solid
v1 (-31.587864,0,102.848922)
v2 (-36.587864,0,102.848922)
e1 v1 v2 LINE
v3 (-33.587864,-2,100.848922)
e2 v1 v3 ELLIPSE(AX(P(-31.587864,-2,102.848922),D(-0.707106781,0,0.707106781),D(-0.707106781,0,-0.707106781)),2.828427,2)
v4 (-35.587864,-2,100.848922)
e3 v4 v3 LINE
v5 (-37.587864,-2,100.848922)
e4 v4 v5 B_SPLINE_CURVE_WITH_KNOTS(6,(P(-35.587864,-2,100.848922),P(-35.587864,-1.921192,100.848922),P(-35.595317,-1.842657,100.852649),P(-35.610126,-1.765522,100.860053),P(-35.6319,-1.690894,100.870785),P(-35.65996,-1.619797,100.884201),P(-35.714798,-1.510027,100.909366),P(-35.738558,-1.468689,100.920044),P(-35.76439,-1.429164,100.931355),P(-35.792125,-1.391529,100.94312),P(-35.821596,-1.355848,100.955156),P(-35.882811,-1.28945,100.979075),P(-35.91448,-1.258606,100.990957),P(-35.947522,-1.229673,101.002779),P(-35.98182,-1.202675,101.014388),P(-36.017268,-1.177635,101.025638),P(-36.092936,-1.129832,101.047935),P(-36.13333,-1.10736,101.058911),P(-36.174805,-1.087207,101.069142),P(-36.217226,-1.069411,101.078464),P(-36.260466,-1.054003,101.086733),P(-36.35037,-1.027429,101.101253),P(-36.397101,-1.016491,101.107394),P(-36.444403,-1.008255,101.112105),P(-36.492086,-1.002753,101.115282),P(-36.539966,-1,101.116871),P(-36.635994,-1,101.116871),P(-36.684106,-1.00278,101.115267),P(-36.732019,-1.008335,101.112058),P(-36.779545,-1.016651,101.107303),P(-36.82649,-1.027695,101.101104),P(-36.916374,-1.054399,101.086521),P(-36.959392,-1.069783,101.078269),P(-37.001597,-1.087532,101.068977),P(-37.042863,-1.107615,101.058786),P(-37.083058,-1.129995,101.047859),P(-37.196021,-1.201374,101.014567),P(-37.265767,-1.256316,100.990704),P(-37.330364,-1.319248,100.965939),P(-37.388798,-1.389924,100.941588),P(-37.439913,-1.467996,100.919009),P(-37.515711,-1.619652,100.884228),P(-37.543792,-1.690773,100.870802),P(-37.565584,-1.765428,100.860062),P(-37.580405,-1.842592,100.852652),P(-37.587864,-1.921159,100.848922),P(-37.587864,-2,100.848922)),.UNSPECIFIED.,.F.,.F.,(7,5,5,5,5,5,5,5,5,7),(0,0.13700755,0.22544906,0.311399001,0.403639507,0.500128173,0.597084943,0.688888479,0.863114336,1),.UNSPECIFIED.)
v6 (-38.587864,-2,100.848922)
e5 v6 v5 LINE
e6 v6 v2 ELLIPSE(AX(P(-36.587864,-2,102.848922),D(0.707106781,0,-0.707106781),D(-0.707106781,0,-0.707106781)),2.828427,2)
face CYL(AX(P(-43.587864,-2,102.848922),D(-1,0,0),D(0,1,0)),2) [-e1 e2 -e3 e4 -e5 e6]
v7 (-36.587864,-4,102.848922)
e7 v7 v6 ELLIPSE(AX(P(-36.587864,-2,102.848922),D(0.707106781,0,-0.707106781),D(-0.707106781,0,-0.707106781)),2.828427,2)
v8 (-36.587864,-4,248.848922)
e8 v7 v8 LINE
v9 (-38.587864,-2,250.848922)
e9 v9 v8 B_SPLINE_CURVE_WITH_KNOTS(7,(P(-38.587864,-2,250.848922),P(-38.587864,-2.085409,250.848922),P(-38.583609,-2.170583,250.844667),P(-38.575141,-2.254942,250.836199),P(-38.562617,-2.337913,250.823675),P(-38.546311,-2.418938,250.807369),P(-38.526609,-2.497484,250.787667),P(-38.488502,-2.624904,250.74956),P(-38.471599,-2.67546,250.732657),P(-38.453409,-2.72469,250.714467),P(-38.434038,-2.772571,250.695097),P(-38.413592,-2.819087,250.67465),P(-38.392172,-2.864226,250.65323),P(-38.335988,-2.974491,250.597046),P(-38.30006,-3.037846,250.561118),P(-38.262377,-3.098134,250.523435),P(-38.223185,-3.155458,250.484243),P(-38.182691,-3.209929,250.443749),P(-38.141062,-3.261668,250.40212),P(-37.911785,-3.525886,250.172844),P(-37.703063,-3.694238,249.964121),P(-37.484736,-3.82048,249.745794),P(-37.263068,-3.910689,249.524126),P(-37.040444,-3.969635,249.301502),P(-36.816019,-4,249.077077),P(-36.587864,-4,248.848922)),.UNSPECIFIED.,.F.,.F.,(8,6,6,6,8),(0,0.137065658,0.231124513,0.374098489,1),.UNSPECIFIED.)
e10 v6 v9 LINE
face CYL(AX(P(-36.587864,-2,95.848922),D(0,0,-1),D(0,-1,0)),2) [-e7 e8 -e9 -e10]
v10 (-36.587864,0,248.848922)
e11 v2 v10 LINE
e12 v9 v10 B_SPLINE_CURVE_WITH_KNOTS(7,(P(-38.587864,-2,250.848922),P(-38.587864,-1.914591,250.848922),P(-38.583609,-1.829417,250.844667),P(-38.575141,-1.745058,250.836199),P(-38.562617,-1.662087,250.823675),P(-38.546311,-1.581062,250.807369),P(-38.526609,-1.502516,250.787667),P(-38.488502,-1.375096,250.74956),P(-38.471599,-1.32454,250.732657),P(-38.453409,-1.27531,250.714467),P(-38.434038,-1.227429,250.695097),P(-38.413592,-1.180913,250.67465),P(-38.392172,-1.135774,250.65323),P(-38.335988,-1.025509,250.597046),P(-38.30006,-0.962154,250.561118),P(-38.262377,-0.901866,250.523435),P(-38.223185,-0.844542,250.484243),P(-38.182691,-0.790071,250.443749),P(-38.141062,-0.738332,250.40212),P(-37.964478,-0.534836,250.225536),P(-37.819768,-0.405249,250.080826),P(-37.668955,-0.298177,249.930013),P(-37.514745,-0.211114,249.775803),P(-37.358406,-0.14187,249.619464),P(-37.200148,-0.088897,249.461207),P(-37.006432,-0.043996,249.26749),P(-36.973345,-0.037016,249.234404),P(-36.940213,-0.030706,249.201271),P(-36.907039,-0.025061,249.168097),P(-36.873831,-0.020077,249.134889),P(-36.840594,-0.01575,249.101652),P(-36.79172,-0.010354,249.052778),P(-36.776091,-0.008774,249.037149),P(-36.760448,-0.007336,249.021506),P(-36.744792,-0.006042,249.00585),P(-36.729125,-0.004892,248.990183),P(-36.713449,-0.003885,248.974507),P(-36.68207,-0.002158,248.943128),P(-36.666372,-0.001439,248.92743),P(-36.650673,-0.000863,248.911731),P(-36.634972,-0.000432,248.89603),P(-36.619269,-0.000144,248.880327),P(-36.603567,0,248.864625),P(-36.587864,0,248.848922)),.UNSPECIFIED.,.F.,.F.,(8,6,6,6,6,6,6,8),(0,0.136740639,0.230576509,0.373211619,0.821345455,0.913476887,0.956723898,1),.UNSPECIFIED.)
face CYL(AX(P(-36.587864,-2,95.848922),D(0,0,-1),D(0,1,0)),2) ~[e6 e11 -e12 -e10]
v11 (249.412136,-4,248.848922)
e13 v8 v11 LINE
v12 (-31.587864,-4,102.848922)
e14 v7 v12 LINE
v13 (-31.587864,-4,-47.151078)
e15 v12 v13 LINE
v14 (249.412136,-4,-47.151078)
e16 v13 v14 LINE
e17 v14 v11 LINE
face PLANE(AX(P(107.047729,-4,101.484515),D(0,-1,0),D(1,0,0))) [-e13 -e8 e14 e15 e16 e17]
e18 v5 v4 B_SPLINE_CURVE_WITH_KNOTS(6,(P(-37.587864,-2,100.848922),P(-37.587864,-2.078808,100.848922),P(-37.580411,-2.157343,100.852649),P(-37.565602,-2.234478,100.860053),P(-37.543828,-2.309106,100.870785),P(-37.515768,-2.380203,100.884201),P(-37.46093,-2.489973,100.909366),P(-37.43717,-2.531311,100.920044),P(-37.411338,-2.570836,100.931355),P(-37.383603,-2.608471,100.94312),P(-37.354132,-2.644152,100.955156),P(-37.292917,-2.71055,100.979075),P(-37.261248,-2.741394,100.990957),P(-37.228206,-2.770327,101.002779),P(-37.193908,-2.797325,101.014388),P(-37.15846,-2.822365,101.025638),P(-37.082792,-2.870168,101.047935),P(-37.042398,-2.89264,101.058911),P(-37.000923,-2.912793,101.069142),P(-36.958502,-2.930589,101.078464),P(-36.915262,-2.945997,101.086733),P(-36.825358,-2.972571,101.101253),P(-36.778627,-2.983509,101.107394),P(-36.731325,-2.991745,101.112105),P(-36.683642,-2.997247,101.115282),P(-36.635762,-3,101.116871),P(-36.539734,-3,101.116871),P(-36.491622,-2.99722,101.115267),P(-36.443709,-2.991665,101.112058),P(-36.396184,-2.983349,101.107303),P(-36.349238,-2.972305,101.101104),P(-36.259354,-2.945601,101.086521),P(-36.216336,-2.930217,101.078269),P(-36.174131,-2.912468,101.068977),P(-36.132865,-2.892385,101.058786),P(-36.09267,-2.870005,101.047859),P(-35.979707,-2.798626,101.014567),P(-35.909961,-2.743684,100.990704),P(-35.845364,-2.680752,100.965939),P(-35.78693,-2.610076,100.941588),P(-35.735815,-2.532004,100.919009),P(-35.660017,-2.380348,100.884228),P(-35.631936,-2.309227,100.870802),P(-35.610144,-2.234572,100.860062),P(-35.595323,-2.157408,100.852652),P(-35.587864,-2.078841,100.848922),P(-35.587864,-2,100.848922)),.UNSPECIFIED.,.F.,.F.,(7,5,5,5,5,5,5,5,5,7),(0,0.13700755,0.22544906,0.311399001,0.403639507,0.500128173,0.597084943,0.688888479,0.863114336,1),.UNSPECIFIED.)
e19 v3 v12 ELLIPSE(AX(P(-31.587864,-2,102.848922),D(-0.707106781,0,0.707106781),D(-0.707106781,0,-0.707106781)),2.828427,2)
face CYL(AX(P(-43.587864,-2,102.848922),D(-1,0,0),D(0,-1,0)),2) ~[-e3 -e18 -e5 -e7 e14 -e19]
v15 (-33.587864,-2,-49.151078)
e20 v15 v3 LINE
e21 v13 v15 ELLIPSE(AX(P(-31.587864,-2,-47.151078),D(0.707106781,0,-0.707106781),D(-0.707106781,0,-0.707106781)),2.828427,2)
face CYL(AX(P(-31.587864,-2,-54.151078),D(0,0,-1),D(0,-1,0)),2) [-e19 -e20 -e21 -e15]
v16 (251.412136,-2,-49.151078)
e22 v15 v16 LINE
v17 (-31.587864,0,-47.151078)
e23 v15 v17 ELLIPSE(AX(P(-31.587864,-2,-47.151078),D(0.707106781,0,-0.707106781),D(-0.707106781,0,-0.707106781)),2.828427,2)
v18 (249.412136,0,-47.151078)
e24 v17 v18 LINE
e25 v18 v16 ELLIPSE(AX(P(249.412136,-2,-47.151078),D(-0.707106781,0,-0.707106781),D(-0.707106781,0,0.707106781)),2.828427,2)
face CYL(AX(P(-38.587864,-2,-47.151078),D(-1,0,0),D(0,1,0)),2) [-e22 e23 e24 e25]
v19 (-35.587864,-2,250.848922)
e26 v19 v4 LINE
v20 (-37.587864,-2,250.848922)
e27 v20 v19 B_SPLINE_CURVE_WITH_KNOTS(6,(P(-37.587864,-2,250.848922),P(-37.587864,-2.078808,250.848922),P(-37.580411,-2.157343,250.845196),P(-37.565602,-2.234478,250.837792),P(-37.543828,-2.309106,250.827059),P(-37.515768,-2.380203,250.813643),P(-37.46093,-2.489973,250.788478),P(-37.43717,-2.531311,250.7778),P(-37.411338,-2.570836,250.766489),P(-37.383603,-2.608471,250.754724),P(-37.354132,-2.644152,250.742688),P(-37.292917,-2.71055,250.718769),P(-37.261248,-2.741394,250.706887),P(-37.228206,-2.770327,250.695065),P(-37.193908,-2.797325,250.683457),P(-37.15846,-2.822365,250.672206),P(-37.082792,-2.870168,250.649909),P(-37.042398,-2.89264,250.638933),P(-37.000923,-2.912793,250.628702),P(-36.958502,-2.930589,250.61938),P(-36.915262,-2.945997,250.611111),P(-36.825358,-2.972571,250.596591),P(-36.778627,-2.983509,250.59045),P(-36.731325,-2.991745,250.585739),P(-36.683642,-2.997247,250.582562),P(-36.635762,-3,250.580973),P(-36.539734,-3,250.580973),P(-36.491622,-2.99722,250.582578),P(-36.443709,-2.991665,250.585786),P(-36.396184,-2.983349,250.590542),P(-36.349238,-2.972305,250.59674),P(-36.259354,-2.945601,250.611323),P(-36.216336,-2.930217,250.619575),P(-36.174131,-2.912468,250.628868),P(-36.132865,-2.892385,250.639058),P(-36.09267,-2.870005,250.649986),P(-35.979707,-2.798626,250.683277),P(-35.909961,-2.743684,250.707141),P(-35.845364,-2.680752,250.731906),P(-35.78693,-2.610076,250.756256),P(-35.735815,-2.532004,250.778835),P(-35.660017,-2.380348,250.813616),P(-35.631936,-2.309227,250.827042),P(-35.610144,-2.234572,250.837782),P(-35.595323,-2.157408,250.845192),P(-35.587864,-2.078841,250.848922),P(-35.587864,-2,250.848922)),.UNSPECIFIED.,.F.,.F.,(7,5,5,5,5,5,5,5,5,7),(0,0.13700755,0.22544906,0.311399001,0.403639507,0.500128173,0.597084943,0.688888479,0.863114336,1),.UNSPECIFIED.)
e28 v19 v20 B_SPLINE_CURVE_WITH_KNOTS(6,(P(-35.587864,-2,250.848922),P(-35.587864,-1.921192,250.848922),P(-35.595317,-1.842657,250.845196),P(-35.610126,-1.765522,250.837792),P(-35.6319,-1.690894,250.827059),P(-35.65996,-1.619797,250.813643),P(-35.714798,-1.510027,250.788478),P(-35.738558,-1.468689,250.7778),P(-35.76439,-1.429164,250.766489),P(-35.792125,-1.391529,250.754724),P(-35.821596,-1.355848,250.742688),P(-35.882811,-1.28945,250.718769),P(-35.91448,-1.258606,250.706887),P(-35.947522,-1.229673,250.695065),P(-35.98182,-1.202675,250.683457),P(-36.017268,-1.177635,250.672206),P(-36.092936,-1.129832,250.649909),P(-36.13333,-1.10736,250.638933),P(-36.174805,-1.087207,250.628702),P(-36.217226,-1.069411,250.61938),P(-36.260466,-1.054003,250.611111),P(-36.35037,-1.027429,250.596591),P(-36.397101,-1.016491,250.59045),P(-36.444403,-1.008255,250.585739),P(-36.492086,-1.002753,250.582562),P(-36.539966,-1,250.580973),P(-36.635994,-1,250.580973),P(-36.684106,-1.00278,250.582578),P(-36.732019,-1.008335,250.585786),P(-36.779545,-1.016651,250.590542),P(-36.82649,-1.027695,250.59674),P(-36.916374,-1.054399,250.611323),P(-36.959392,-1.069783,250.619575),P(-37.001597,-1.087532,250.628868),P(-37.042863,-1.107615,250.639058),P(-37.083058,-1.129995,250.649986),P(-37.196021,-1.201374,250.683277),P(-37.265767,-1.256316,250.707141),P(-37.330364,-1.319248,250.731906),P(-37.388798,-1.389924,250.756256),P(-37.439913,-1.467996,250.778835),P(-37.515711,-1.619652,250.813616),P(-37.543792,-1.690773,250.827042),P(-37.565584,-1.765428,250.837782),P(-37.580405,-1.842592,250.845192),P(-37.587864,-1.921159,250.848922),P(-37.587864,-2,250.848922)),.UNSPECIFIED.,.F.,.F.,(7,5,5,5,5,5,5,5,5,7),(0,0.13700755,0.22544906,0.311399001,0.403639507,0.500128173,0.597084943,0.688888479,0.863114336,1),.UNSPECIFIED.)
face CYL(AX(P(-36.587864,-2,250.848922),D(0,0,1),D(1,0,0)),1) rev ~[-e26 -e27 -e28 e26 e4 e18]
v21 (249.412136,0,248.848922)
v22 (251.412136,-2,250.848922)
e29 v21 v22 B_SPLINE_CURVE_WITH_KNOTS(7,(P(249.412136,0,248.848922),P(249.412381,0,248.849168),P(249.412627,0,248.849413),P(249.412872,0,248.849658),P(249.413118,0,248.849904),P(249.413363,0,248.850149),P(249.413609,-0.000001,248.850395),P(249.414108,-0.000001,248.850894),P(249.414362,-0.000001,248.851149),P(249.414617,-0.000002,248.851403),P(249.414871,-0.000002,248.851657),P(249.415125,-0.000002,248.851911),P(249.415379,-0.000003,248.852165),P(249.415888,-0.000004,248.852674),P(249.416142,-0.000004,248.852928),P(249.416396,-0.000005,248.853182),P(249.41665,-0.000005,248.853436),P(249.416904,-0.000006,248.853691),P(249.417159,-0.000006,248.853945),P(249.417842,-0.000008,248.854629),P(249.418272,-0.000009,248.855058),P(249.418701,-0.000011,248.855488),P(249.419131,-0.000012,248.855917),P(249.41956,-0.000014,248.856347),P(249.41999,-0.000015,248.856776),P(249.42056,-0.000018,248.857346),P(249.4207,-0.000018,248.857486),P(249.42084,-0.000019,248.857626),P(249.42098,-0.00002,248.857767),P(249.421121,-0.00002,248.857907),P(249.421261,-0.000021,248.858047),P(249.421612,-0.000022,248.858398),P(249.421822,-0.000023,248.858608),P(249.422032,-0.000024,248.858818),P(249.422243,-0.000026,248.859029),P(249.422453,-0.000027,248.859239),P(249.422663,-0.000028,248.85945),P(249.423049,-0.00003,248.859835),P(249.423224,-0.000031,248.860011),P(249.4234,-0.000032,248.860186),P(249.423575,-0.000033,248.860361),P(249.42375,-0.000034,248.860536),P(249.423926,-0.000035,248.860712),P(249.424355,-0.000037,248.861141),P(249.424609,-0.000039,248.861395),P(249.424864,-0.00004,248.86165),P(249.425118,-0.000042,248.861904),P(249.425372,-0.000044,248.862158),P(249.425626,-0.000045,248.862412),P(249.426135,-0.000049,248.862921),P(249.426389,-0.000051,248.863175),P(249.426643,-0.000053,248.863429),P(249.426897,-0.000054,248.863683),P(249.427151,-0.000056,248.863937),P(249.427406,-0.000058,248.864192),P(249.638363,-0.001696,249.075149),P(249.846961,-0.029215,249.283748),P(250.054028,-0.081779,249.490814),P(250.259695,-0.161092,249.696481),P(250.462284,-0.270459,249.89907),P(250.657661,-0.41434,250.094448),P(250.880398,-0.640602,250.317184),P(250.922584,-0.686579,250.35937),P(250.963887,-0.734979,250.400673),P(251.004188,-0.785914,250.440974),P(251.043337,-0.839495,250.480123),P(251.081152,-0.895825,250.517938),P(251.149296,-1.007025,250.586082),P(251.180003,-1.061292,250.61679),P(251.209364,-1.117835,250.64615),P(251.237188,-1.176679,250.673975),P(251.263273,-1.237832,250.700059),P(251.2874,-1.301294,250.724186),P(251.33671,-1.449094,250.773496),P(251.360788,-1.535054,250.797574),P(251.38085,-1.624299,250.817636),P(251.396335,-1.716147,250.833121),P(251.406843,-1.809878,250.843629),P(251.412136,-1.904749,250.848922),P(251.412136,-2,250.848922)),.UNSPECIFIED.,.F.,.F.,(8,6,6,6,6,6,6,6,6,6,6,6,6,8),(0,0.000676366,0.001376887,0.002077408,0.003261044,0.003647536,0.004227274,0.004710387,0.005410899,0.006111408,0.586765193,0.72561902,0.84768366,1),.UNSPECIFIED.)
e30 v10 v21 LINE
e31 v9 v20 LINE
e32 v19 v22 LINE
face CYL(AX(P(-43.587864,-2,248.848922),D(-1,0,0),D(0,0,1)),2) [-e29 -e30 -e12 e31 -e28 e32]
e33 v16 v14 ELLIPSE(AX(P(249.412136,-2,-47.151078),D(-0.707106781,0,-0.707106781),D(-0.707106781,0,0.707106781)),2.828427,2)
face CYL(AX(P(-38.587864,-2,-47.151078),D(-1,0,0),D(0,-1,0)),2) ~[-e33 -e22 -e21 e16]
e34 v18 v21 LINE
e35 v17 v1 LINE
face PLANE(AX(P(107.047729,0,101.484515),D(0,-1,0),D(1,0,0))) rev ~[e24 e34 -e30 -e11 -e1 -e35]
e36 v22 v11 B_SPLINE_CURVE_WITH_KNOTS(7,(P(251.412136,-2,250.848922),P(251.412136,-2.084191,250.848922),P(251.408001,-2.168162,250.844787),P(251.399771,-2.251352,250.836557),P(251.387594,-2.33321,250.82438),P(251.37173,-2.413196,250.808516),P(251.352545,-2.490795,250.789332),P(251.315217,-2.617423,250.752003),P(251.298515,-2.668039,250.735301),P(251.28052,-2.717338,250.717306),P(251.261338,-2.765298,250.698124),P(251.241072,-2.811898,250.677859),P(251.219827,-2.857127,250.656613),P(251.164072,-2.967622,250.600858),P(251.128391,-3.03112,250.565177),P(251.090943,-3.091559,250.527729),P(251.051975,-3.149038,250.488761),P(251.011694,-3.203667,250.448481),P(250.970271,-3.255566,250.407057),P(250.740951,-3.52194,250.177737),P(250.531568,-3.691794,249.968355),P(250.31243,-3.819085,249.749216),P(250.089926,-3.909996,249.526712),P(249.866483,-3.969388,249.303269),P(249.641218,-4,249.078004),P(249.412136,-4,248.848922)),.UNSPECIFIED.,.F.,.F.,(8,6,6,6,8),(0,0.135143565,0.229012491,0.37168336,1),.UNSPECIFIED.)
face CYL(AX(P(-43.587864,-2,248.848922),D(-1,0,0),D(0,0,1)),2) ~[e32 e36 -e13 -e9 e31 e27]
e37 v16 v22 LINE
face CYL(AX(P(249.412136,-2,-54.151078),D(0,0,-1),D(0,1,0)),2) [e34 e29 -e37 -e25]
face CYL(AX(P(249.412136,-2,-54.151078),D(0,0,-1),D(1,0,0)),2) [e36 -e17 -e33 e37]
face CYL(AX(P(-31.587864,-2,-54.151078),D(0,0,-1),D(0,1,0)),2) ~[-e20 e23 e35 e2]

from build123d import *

# Parameters (mm, degrees)
F1_DEPTH     = 4
F2_R         = 1
F3_DEPTH     = 310
F4_T1_DEPTH  = 300
F4_T3_DEPTH  = 160
F4_T5_DEPTH  = 10
F4_T7_DEPTH  = 155
F4_T9_DEPTH  = 295
F4_T11_DEPTH = 310
F4_T17_DEPTH = 15
F4_T21_DEPTH = 160
F5_T1_DEPTH  = 300
F5_T3_DEPTH  = 160
F5_T5_DEPTH  = 10
F5_T7_DEPTH  = 155
F5_T9_DEPTH  = 295
F5_T11_DEPTH = 310
F5_T17_DEPTH = 15
F5_T21_DEPTH = 160


# Not quite as in the source:
# - a fillet or chamfer that OpenCascade refuses, or shapes differently, is made with other operations: its cross-section is extruded or revolved along the edge and cut away or added


with BuildPart() as f1:
    # F0 (on Front) → F1 (new body)
    with BuildSketch(Plane.XZ):
        Polygon((251.4121359825, 250.8489221025), (-38.5878640175, 250.8489221025), (-38.5878640175, 100.8489221025), (-33.5878640175, 100.8489221025), (-33.5878640175, -49.1510778975), (251.4121359825, -49.1510778975), align=None)
    extrude(amount=F1_DEPTH)

    # F2 (on face) → F3 (cut)
    with BuildSketch(Plane.XY.offset(250.8489221025)):
        with Locations((-36.5878640175, -2)):
            Circle(F2_R)
    extrude(amount=-F3_DEPTH, mode=Mode.SUBTRACT)

    # F4: fillet of radius 2 on 6 edges, made by hand

    # F4_s2 → F4_t1 (cut)
    with BuildSketch(Plane.YZ.offset(-43.5878640175)):
        with BuildLine():
            ThreePointArc((-2, 250.8489221025), (-3.4142135624, 250.2631356648), (-4, 248.8489221025))
            Line((-4, 248.8489221025), (-4, 250.8489221025))
            Line((-4, 250.8489221025), (-2, 250.8489221025))
        make_face()
    extrude(amount=F4_T1_DEPTH, mode=Mode.SUBTRACT)

    # F4_s4 → F4_t3 (cut)
    with BuildSketch(Plane.XY.offset(95.8489221025)):
        with BuildLine():
            ThreePointArc((-36.5878640175, -4), (-38.0020775799, -3.4142135624), (-38.5878640175, -2))
            Line((-38.5878640175, -2), (-38.5878640175, -4))
            Line((-38.5878640175, -4), (-36.5878640175, -4))
        make_face()
    extrude(amount=F4_T3_DEPTH, mode=Mode.SUBTRACT)

    # F4_s6 → F4_t5 (cut)
    with BuildSketch(Plane.YZ.offset(-43.5878640175)):
        with BuildLine():
            ThreePointArc((-4, 102.8489221025), (-3.4142135624, 101.4347085401), (-2, 100.8489221025))
            Line((-2, 100.8489221025), (-4, 100.8489221025))
            Line((-4, 100.8489221025), (-4, 102.8489221025))
        make_face()
    extrude(amount=F4_T5_DEPTH, mode=Mode.SUBTRACT)

    # F4_s8 → F4_t7 (cut)
    with BuildSketch(Plane.XY.offset(-54.1510778975)):
        with BuildLine():
            ThreePointArc((-31.5878640175, -4), (-33.0020775799, -3.4142135624), (-33.5878640175, -2))
            Line((-33.5878640175, -2), (-33.5878640175, -4))
            Line((-33.5878640175, -4), (-31.5878640175, -4))
        make_face()
    extrude(amount=F4_T7_DEPTH, mode=Mode.SUBTRACT)

    # F4_s10 → F4_t9 (cut)
    with BuildSketch(Plane.YZ.offset(-38.5878640175)):
        with BuildLine():
            ThreePointArc((-4, -47.1510778975), (-3.4142135624, -48.5652914599), (-2, -49.1510778975))
            Line((-2, -49.1510778975), (-4, -49.1510778975))
            Line((-4, -49.1510778975), (-4, -47.1510778975))
        make_face()
    extrude(amount=F4_T9_DEPTH, mode=Mode.SUBTRACT)

    # F4_s12 → F4_t11 (cut)
    with BuildSketch(Plane.XY.offset(-54.1510778975)):
        with BuildLine():
            ThreePointArc((251.4121359825, -2), (250.8263495449, -3.4142135624), (249.4121359825, -4))
            Line((249.4121359825, -4), (251.4121359825, -4))
            Line((251.4121359825, -4), (251.4121359825, -2))
        make_face()
    extrude(amount=F4_T11_DEPTH, mode=Mode.SUBTRACT)


with BuildPart() as f4_tool15:
    # F4_s16 → F4_t17 (new body)
    with BuildSketch(Plane.YZ.offset(-43.5878640175)):
        with BuildLine():
            ThreePointArc((-4, 102.8489221025), (-3.4142135624, 101.4347085401), (-2, 100.8489221025))
            Line((-2, 100.8489221025), (-4, 100.8489221025))
            Line((-4, 100.8489221025), (-4, 102.8489221025))
        make_face()
    extrude(amount=F4_T17_DEPTH)

    split(bisect_by=Plane.YZ.offset(-33.5878640175), keep=Keep.TOP)


with BuildPart() as f4_tool19:
    # F4_s20 → F4_t21 (new body)
    with BuildSketch(Plane.XY.offset(105.8489221025)):
        with BuildLine():
            ThreePointArc((-31.5878640175, -4), (-33.0020775799, -3.4142135624), (-33.5878640175, -2))
            Line((-33.5878640175, -2), (-33.5878640175, -4))
            Line((-33.5878640175, -4), (-31.5878640175, -4))
        make_face()
    extrude(amount=-F4_T21_DEPTH)

    split(bisect_by=Plane.XY.offset(100.8489221025), keep=Keep.TOP)


with BuildPart() as f4_tool15_1:
    add(f4_tool15.part)

    # F4_t23: intersect F4_tool19
    add(f4_tool19.part, mode=Mode.INTERSECT)


with BuildPart() as f1_1:
    add(f1.part)

    # F4_t13: cut F4_tool15
    add(f4_tool15_1.part, mode=Mode.SUBTRACT)

    # F5: fillet of radius 2 on 6 edges, made by hand

    # F5_s2 → F5_t1 (cut)
    with BuildSketch(Plane.YZ.offset(-43.5878640175)):
        with BuildLine():
            ThreePointArc((-2, 250.8489221025), (-0.5857864376, 250.2631356648), (0, 248.8489221025))
            Line((0, 248.8489221025), (0, 250.8489221025))
            Line((0, 250.8489221025), (-2, 250.8489221025))
        make_face()
    extrude(amount=F5_T1_DEPTH, mode=Mode.SUBTRACT)

    # F5_s4 → F5_t3 (cut)
    with BuildSketch(Plane.XY.offset(95.8489221025)):
        with BuildLine():
            ThreePointArc((-36.5878640175, 0), (-38.0020775799, -0.5857864376), (-38.5878640175, -2))
            Line((-38.5878640175, -2), (-38.5878640175, 0))
            Line((-38.5878640175, 0), (-36.5878640175, 0))
        make_face()
    extrude(amount=F5_T3_DEPTH, mode=Mode.SUBTRACT)

    # F5_s6 → F5_t5 (cut)
    with BuildSketch(Plane.YZ.offset(-43.5878640175)):
        with BuildLine():
            ThreePointArc((0, 102.8489221025), (-0.5857864376, 101.4347085401), (-2, 100.8489221025))
            Line((-2, 100.8489221025), (0, 100.8489221025))
            Line((0, 100.8489221025), (0, 102.8489221025))
        make_face()
    extrude(amount=F5_T5_DEPTH, mode=Mode.SUBTRACT)

    # F5_s8 → F5_t7 (cut)
    with BuildSketch(Plane.XY.offset(-54.1510778975)):
        with BuildLine():
            ThreePointArc((-31.5878640175, 0), (-33.0020775799, -0.5857864376), (-33.5878640175, -2))
            Line((-33.5878640175, -2), (-33.5878640175, 0))
            Line((-33.5878640175, 0), (-31.5878640175, 0))
        make_face()
    extrude(amount=F5_T7_DEPTH, mode=Mode.SUBTRACT)

    # F5_s10 → F5_t9 (cut)
    with BuildSketch(Plane.YZ.offset(-38.5878640175)):
        with BuildLine():
            ThreePointArc((0, -47.1510778975), (-0.5857864376, -48.5652914599), (-2, -49.1510778975))
            Line((-2, -49.1510778975), (0, -49.1510778975))
            Line((0, -49.1510778975), (0, -47.1510778975))
        make_face()
    extrude(amount=F5_T9_DEPTH, mode=Mode.SUBTRACT)

    # F5_s12 → F5_t11 (cut)
    with BuildSketch(Plane.XY.offset(-54.1510778975)):
        with BuildLine():
            ThreePointArc((249.4121359825, 0), (250.8263495449, -0.5857864376), (251.4121359825, -2))
            Line((251.4121359825, -2), (251.4121359825, 0))
            Line((251.4121359825, 0), (249.4121359825, 0))
        make_face()
    extrude(amount=F5_T11_DEPTH, mode=Mode.SUBTRACT)


with BuildPart() as f5_tool15:
    # F5_s16 → F5_t17 (new body)
    with BuildSketch(Plane.YZ.offset(-43.5878640175)):
        with BuildLine():
            ThreePointArc((0, 102.8489221025), (-0.5857864376, 101.4347085401), (-2, 100.8489221025))
            Line((-2, 100.8489221025), (0, 100.8489221025))
            Line((0, 100.8489221025), (0, 102.8489221025))
        make_face()
    extrude(amount=F5_T17_DEPTH)

    split(bisect_by=Plane.YZ.offset(-33.5878640175), keep=Keep.TOP)


with BuildPart() as f5_tool19:
    # F5_s20 → F5_t21 (new body)
    with BuildSketch(Plane.XY.offset(105.8489221025)):
        with BuildLine():
            ThreePointArc((-31.5878640175, 0), (-33.0020775799, -0.5857864376), (-33.5878640175, -2))
            Line((-33.5878640175, -2), (-33.5878640175, 0))
            Line((-33.5878640175, 0), (-31.5878640175, 0))
        make_face()
    extrude(amount=-F5_T21_DEPTH)

    split(bisect_by=Plane.XY.offset(100.8489221025), keep=Keep.TOP)


with BuildPart() as f5_tool15_1:
    add(f5_tool15.part)

    # F5_t23: intersect F5_tool19
    add(f5_tool19.part, mode=Mode.INTERSECT)


with BuildPart() as f1_2:
    add(f1_1.part)

    # F5_t13: cut F5_tool15
    add(f5_tool15_1.part, mode=Mode.SUBTRACT)


solid = f1_2.part
